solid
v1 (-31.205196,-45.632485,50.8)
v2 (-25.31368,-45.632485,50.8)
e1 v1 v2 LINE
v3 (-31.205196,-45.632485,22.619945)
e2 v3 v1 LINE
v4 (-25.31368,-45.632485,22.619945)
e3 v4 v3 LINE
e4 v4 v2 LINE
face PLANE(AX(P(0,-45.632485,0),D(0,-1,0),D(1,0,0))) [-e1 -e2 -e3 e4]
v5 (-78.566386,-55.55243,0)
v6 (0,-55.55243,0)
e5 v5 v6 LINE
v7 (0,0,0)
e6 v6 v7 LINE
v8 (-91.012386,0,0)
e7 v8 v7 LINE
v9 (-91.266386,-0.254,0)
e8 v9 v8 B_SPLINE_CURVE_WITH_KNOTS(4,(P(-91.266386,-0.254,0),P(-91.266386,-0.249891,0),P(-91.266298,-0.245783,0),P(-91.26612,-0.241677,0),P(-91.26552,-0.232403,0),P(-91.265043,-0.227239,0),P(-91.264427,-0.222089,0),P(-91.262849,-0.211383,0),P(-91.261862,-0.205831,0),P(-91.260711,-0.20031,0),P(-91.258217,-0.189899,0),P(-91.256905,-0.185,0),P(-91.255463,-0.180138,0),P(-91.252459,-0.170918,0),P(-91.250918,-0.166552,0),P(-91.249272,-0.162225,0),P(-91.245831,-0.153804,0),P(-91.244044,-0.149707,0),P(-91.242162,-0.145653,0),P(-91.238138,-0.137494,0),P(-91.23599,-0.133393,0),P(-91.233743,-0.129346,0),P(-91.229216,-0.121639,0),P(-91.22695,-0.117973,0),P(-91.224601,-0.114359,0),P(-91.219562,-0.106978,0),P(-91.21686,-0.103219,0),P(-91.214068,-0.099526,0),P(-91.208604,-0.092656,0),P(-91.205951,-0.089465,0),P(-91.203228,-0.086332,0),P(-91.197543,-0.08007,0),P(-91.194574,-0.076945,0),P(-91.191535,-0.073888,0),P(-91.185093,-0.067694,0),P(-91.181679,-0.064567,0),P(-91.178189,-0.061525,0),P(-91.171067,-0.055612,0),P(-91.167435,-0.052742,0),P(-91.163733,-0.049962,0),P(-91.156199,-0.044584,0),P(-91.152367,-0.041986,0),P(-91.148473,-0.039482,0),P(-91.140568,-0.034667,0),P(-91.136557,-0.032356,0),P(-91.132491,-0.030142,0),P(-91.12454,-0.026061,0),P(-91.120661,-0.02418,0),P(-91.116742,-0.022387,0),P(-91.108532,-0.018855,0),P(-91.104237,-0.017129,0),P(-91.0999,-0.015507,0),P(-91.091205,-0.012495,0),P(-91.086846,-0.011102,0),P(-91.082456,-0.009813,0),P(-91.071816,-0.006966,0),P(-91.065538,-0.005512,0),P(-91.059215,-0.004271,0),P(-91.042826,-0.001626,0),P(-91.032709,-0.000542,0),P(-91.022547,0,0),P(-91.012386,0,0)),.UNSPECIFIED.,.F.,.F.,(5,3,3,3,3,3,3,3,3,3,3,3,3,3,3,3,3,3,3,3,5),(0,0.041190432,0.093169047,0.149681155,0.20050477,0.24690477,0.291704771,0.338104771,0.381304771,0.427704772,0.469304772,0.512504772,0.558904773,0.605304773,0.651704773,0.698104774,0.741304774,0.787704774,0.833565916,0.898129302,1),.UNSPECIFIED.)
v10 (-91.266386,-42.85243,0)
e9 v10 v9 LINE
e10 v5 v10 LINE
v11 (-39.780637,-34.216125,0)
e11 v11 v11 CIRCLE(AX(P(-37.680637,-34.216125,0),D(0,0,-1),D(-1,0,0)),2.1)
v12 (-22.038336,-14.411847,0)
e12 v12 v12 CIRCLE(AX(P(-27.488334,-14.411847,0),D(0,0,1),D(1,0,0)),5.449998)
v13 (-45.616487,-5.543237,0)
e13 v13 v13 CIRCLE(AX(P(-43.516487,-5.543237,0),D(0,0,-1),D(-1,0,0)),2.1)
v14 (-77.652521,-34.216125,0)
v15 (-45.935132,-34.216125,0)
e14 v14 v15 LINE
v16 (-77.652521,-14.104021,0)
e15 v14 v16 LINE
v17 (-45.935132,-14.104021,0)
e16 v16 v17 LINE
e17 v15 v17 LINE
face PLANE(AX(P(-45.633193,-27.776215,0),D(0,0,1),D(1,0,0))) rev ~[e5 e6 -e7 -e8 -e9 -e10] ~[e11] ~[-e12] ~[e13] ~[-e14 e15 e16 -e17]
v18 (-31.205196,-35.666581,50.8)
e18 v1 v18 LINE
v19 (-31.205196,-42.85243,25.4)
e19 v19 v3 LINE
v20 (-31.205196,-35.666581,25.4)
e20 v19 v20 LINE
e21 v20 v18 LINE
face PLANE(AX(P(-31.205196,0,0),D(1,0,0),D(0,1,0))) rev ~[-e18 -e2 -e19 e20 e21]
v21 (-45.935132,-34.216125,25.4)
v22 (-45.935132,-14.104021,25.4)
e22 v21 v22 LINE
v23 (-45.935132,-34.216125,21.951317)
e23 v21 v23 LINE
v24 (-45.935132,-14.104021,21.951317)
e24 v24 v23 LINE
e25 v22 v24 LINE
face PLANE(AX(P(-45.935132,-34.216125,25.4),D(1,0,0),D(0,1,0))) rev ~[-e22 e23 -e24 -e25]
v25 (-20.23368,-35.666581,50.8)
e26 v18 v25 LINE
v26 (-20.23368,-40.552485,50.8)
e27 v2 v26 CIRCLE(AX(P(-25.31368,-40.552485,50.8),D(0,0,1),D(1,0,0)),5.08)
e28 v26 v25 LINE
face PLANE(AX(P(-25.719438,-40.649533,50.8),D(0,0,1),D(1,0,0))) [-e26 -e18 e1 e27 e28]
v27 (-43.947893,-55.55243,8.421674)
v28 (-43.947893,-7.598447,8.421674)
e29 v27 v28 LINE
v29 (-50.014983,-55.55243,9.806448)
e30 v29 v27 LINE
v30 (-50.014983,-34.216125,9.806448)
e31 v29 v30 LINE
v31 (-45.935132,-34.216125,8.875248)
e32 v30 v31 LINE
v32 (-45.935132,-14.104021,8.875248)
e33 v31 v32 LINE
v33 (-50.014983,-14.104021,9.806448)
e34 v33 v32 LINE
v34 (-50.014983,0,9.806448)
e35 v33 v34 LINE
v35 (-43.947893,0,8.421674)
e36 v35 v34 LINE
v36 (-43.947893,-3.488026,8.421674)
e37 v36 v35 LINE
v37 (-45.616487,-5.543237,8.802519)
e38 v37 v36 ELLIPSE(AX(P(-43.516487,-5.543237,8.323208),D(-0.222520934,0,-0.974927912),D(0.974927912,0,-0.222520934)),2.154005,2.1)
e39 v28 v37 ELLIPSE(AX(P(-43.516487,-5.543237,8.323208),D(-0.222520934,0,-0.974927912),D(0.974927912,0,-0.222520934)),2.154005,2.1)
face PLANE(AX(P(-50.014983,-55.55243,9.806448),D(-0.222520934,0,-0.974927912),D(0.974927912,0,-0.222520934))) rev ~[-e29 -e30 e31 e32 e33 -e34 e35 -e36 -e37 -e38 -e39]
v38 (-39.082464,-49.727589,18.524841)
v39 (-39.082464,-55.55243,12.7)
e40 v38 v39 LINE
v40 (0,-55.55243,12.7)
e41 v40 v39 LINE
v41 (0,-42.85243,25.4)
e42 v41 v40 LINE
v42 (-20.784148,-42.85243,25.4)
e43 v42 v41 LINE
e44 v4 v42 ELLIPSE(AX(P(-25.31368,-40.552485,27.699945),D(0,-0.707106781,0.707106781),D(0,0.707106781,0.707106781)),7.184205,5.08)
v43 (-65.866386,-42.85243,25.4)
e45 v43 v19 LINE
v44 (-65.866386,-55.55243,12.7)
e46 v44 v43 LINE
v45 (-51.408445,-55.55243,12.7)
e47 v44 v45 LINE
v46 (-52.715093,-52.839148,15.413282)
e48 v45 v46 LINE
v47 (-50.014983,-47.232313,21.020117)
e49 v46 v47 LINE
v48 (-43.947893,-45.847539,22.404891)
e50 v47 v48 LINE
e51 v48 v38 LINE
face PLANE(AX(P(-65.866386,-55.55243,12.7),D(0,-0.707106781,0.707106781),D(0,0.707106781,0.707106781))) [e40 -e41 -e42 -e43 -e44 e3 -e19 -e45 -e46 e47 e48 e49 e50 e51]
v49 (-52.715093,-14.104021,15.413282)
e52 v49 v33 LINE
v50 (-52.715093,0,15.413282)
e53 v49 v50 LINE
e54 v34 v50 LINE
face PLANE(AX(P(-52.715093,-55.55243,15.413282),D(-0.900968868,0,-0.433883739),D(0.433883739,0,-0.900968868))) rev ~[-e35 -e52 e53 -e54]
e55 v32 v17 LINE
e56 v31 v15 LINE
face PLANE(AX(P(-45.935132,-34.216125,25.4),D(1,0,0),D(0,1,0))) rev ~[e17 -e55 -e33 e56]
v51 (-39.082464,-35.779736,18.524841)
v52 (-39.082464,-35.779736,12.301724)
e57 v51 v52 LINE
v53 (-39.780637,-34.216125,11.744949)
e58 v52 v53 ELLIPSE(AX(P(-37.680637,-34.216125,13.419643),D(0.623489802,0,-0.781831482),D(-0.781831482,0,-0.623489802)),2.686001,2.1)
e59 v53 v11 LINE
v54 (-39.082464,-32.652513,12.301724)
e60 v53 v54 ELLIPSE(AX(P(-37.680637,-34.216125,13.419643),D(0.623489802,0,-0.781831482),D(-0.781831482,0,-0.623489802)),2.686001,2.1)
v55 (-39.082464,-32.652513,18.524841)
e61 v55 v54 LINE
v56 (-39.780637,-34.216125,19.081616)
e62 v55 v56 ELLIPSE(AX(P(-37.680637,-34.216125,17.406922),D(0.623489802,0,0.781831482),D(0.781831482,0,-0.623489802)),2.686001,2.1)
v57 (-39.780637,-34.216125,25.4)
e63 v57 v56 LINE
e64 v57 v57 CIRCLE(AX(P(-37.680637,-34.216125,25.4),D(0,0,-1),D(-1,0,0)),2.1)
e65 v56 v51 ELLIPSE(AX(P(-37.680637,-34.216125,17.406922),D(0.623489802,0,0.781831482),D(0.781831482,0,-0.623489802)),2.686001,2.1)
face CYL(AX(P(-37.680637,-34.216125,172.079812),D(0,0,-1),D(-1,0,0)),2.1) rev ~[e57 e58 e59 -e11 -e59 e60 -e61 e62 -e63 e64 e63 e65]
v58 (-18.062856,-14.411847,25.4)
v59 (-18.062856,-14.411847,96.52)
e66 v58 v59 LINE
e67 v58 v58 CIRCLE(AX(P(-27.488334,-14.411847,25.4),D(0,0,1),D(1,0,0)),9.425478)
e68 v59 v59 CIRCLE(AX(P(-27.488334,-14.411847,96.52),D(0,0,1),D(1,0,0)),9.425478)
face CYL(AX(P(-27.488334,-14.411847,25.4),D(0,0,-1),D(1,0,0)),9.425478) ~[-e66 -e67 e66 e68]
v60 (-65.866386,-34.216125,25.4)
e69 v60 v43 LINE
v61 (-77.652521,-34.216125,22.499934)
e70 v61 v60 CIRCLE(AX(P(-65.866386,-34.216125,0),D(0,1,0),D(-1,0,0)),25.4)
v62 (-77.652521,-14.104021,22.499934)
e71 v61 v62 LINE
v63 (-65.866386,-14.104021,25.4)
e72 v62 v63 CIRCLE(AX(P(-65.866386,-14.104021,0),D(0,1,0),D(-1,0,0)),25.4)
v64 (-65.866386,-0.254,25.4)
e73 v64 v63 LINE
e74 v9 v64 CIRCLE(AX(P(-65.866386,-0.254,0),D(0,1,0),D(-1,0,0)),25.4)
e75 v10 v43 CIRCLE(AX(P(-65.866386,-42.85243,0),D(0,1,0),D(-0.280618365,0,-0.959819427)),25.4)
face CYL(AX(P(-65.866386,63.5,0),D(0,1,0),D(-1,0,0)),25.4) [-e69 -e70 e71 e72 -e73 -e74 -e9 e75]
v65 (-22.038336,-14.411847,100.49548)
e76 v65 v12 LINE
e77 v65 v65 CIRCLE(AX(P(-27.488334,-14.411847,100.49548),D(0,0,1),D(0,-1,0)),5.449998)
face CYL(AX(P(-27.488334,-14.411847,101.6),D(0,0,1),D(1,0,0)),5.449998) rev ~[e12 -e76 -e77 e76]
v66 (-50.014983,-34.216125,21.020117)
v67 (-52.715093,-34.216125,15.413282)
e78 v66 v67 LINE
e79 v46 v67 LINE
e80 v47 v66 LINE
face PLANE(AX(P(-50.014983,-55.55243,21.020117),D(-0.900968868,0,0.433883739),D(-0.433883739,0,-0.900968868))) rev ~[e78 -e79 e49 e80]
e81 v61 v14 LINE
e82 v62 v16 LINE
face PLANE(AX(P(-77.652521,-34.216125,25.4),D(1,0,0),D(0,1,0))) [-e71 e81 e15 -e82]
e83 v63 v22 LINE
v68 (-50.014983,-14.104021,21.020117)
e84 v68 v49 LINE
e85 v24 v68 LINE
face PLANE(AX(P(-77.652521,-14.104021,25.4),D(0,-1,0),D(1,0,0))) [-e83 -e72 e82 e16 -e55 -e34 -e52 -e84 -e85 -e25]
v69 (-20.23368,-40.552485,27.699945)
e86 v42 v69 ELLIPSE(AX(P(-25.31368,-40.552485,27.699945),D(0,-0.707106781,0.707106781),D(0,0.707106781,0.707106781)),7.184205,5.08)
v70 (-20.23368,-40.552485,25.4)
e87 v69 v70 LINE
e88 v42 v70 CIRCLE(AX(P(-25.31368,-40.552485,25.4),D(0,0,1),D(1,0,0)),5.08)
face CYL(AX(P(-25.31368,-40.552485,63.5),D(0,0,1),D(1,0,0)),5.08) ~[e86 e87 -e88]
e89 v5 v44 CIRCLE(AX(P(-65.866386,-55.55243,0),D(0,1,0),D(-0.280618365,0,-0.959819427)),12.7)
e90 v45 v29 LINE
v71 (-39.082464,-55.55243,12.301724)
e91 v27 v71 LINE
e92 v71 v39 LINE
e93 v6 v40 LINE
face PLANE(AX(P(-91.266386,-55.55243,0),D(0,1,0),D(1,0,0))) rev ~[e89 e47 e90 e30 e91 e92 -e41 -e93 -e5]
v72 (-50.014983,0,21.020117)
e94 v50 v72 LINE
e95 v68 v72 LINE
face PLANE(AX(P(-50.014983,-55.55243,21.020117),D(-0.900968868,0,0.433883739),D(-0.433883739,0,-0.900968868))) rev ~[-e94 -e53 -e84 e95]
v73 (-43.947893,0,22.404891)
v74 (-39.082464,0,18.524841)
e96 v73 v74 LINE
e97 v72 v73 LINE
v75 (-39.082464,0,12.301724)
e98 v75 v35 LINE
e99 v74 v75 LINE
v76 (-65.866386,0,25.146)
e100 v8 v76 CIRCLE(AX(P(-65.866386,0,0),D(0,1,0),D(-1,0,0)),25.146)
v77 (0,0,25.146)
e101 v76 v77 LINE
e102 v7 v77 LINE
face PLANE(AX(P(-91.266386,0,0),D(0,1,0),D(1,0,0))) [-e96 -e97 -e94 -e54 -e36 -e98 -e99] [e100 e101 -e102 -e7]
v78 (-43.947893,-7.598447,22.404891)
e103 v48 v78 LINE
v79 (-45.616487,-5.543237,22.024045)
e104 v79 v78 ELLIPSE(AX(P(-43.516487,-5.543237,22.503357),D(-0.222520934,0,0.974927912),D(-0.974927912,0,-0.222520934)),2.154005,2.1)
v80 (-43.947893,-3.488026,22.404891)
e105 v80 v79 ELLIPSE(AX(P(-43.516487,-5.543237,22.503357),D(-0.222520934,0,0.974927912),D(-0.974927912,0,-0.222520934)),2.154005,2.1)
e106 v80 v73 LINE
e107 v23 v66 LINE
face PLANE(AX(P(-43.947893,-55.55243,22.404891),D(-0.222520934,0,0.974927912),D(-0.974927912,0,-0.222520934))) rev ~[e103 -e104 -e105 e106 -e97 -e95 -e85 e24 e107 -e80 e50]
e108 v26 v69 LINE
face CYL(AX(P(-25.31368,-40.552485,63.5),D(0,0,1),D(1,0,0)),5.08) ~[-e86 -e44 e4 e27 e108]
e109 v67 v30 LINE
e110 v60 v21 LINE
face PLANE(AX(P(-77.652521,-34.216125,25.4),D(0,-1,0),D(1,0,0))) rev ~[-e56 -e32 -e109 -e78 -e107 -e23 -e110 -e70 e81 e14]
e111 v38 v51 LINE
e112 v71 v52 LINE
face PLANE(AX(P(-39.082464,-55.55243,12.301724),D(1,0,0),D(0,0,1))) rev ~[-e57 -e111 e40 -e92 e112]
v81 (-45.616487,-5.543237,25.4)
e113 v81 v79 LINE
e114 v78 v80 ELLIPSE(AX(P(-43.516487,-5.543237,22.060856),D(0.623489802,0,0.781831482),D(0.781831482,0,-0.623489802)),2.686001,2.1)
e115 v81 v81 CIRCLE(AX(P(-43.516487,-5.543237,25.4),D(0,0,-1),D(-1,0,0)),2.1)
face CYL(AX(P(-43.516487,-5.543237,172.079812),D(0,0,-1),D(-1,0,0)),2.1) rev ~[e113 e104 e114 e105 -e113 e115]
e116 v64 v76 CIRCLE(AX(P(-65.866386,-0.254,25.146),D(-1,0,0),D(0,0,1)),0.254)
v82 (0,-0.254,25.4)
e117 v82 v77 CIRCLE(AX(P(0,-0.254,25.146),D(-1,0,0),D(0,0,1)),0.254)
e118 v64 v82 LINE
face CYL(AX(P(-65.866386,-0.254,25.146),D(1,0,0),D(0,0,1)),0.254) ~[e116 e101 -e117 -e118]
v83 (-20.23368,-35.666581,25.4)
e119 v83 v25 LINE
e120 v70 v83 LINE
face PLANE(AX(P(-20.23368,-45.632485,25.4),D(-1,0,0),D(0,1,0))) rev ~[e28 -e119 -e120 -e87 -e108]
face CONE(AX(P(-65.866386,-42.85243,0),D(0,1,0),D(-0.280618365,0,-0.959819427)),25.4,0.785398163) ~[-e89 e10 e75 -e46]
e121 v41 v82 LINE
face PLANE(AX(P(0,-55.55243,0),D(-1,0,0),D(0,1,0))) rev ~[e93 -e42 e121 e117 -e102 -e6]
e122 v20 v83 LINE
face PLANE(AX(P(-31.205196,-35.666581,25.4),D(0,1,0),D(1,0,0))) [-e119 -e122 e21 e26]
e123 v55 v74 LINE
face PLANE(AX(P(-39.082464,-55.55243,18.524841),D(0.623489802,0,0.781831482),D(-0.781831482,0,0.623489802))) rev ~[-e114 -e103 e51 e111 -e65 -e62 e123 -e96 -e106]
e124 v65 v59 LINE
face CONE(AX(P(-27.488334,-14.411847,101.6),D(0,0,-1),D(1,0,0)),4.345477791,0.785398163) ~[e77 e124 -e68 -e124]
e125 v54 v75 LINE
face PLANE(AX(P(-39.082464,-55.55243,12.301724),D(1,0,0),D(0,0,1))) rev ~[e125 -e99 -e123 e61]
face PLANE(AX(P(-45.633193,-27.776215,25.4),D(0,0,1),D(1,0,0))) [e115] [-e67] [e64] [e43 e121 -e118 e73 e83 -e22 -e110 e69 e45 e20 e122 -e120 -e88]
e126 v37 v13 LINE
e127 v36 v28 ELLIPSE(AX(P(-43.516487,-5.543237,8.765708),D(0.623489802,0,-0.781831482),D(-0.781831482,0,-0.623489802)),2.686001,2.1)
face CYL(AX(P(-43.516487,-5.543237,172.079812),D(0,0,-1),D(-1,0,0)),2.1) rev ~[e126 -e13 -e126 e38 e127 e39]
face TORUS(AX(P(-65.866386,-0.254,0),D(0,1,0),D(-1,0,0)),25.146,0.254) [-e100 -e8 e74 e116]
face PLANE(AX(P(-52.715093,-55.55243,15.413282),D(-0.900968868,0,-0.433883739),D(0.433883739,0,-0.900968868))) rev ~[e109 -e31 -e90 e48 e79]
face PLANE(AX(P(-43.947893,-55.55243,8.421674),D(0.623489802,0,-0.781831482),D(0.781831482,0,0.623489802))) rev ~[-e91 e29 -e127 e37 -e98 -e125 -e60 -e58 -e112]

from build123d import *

# Parameters (mm, degrees)
F0_W          = 91.2663862109
F0_H          = 55.5524304509
F1_DEPTH      = 25.4
F2_W          = 31.717389822
F2_H          = 20.1121037826
F3_DEPTH      = 25.401
F4_R          = 9.4254777906
F5_DEPTH      = 76.2
F7_DEPTH      = 55.5534304509
F8_R          = 5.4499976888
F9_DEPTH      = 101.601
F10_W         = 10.9715163708
F10_H         = 9.965904057
F11_DEPTH     = 25.4
F12_T1_DEPTH  = 182.5524304509
F13_T4_DEPTH  = 98.5267601581
F13_T10_DEPTH = 98.5267601581
F13_T16_DEPTH = 98.5267601581
F13_T23_DEPTH = 98.5267601581
F13_T29_DEPTH = 98.5267601581
F13_T33_ANGLE = 163.70288589
F15_T4_DEPTH  = 53.5800548494
F15_T10_DEPTH = 53.5800548494
F15_T16_DEPTH = 53.5800548494
F17_D         = 4.2
F18_R         = 0.254


# Not quite as in the source:
# - a fillet or chamfer that OpenCascade refuses, or shapes differently, is made with other operations: its cross-section is extruded or revolved along the edge and cut away or added


with BuildPart() as f1:
    # F0 (on Top) → F1 (new body)
    with BuildSketch(Plane.XY):
        with Locations((-45.6331931055, -27.7762152255)):
            Rectangle(F0_W, F0_H)
    extrude(amount=F1_DEPTH)

    # F2 (on face) → F3 (cut, through all)
    with BuildSketch(Plane.XY.offset(25.4)):
        with Locations((-61.7938265204, -24.1600726731)):
            Rectangle(F2_W, F2_H)
    extrude(amount=-F3_DEPTH, mode=Mode.SUBTRACT)

    # F4 (on face) → F5 (join)
    with BuildSketch(Plane.XY.offset(25.4)):
        with Locations((-27.4883341044, -14.4118471071)):
            Circle(F4_R)
    extrude(amount=F5_DEPTH)

    # F6 (on face) → F7 (cut, through all)
    with BuildSketch(Plane.XZ.offset(55.5524304509)):
        Polygon((-39.0824638307, 12.301723844), (-39.0824638307, 18.5248410342), (-43.9478927691, 22.4048911381), (-50.0149834187, 21.0201172888), (-52.7150927741, 15.4132824391), (-50.0149834187, 9.8064475894), (-43.9478927691, 8.4216737401), align=None)
    extrude(amount=-F7_DEPTH, mode=Mode.SUBTRACT)

    # F8 (on face) → F9 (cut, through all)
    with BuildSketch(Plane.XY.offset(101.6)):
        with Locations((-27.4883341044, -14.4118471071)):
            Circle(F8_R)
    extrude(amount=-F9_DEPTH, mode=Mode.SUBTRACT)

    # F10 (on face) → F11 (join)
    with BuildSketch(Plane.XY.offset(25.4)):
        with Locations((-25.7194377482, -40.6495332718)):
            Rectangle(F10_W, F10_H)
    extrude(amount=F11_DEPTH)

    # F12: fillet of radius 25.4 on 1 edges, made by hand

    # F12_s2 → F12_t1 (cut)
    with BuildSketch(Plane.XZ.offset(-63.5)):
        with BuildLine():
            ThreePointArc((-91.2663862109, 0), (-83.8268984531, 17.9605122421), (-65.8663862109, 25.4))
            Line((-65.8663862109, 25.4), (-91.2663862109, 25.4))
            Line((-91.2663862109, 25.4), (-91.2663862109, 0))
        make_face()
    extrude(amount=F12_T1_DEPTH, mode=Mode.SUBTRACT)

    # F13: chamfer of 12.7 on 1 edges, made by hand


with BuildPart() as f13_tool2:
    # F13_s3 → F13_t4 (new body)
    with BuildSketch(Plane.YZ.offset(-65.8663862109)):
        Polygon((-55.5524304509, 12.7), (-42.8524304509, 25.4), (-55.5524304509, 25.4), align=None)
    extrude(amount=F13_T4_DEPTH)

    split(bisect_by=Plane.YZ.offset(-31.2051959336), keep=Keep.BOTTOM)

    split(bisect_by=Plane.XZ.offset(45.6324853003), keep=Keep.TOP)


with BuildPart() as f1_1:
    add(f1.part)

    # F13_t1: cut F13_tool2
    add(f13_tool2.part, mode=Mode.SUBTRACT)


with BuildPart() as f13_tool8:
    # F13_s9 → F13_t10 (new body)
    with BuildSketch(Plane.YZ.offset(-65.8663862109)):
        Polygon((-55.5524304509, 12.7), (-42.8524304509, 25.4), (-55.5524304509, 25.4), align=None)
    extrude(amount=F13_T10_DEPTH)

    split(bisect_by=Plane.YZ.offset(-31.2051959336), keep=Keep.BOTTOM)

    split(bisect_by=Plane.XZ.offset(45.6324853003), keep=Keep.BOTTOM)


with BuildPart() as f1_2:
    add(f1_1.part)

    # F13_t7: cut F13_tool8
    add(f13_tool8.part, mode=Mode.SUBTRACT)


with BuildPart() as f13_tool14:
    # F13_s15 → F13_t16 (new body)
    with BuildSketch(Plane.YZ.offset(-65.8663862109)):
        Polygon((-55.5524304509, 12.7), (-42.8524304509, 25.4), (-55.5524304509, 25.4), align=None)
    extrude(amount=F13_T16_DEPTH)

    split(bisect_by=Plane.YZ.offset(-20.2336795628), keep=Keep.BOTTOM)

    split(bisect_by=Plane.YZ.offset(-31.2051959336), keep=Keep.TOP)

    split(bisect_by=Plane.XZ.offset(45.6324853003), keep=Keep.TOP)


with BuildPart() as f1_3:
    add(f1_2.part)

    # F13_t13: cut F13_tool14
    add(f13_tool14.part, mode=Mode.SUBTRACT)


with BuildPart() as f13_tool21:
    # F13_s22 → F13_t23 (new body)
    with BuildSketch(Plane.YZ.offset(-65.8663862109)):
        Polygon((-55.5524304509, 12.7), (-42.8524304509, 25.4), (-55.5524304509, 25.4), align=None)
    extrude(amount=F13_T23_DEPTH)

    split(bisect_by=Plane.YZ.offset(-20.2336795628), keep=Keep.TOP)

    split(bisect_by=Plane.XZ.offset(45.6324853003), keep=Keep.TOP)


with BuildPart() as f1_4:
    add(f1_3.part)

    # F13_t20: cut F13_tool21
    add(f13_tool21.part, mode=Mode.SUBTRACT)


with BuildPart() as f13_tool27:
    # F13_s28 → F13_t29 (new body)
    with BuildSketch(Plane.YZ.offset(-65.8663862109)):
        Polygon((-55.5524304509, 12.7), (-42.8524304509, 25.4), (-55.5524304509, 25.4), align=None)
    extrude(amount=F13_T29_DEPTH)

    split(bisect_by=Plane.YZ.offset(-20.2336795628), keep=Keep.TOP)

    split(bisect_by=Plane.XZ.offset(45.6324853003), keep=Keep.BOTTOM)


with BuildPart() as f1_5:
    add(f1_4.part)

    # F13_t26: cut F13_tool27
    add(f13_tool27.part, mode=Mode.SUBTRACT)

    # F13_s32 → F13_t33 (revolve, cut)
    with BuildSketch(Plane(origin=(-60.6796278509, 0, 17.7406473118), x_dir=(0, 1, 0), z_dir=(0.9598194275, 0, -0.2806183648))):
        Polygon((-42.8524304509, -43.8833175952), (-55.5524304509, -31.1833175952), (-55.5524304509, -43.8833175952), align=None)
    revolve(axis=Axis((-65.8663862109, -55.5524304509, 0), (0, 1, 0)), revolution_arc=F13_T33_ANGLE, mode=Mode.SUBTRACT)

    # F14: chamfer of 5.08 on 1 edges, made by hand

    # F14_s1 → F14_t2 (revolve, cut)
    with BuildSketch(Plane.XZ.offset(14.4118471071)):
        Polygon((-23.1428563138, 101.6), (-18.0628563138, 96.52), (-18.0628563138, 101.6), align=None)
    revolve(axis=Axis((-27.4883341044, -14.4118471071, 101.6), (0, 0, 1)), mode=Mode.SUBTRACT)

    # F15: fillet of radius 5.08 on 1 edges, made by hand


with BuildPart() as f15_tool2:
    # F15_s3 → F15_t4 (new body)
    with BuildSketch(Plane.XY.offset(63.5)):
        with BuildLine():
            ThreePointArc((-20.2336795628, -40.5524853003), (-21.7215771144, -44.1445877487), (-25.3136795628, -45.6324853003))
            Line((-25.3136795628, -45.6324853003), (-20.2336795628, -45.6324853003))
            Line((-20.2336795628, -45.6324853003), (-20.2336795628, -40.5524853003))
        make_face()
    extrude(amount=-F15_T4_DEPTH)

    split(bisect_by=Plane.XY.offset(25.4), keep=Keep.TOP)

    split(bisect_by=Plane(origin=(0, -34.1262152254, 34.1262152254), x_dir=(1, 0, 0), z_dir=(0, -0.7071067812, 0.7071067812)), keep=Keep.TOP)


with BuildPart() as f1_6:
    add(f1_5.part)

    # F15_t1: cut F15_tool2
    add(f15_tool2.part, mode=Mode.SUBTRACT)


with BuildPart() as f15_tool8:
    # F15_s9 → F15_t10 (new body)
    with BuildSketch(Plane.XY.offset(63.5)):
        with BuildLine():
            ThreePointArc((-20.2336795628, -40.5524853003), (-21.7215771144, -44.1445877487), (-25.3136795628, -45.6324853003))
            Line((-25.3136795628, -45.6324853003), (-20.2336795628, -45.6324853003))
            Line((-20.2336795628, -45.6324853003), (-20.2336795628, -40.5524853003))
        make_face()
    extrude(amount=-F15_T10_DEPTH)

    split(bisect_by=Plane.XY.offset(25.4), keep=Keep.BOTTOM)

    split(bisect_by=Plane(origin=(0, -34.1262152255, 34.1262152254), x_dir=(1, 0, 0), z_dir=(0, -0.7071067812, 0.7071067812)), keep=Keep.TOP)


with BuildPart() as f1_7:
    add(f1_6.part)

    # F15_t7: cut F15_tool8
    add(f15_tool8.part, mode=Mode.SUBTRACT)


with BuildPart() as f15_tool14:
    # F15_s15 → F15_t16 (new body)
    with BuildSketch(Plane.XY.offset(63.5)):
        with BuildLine():
            ThreePointArc((-20.2336795628, -40.5524853003), (-21.7215771144, -44.1445877487), (-25.3136795628, -45.6324853003))
            Line((-25.3136795628, -45.6324853003), (-20.2336795628, -45.6324853003))
            Line((-20.2336795628, -45.6324853003), (-20.2336795628, -40.5524853003))
        make_face()
    extrude(amount=-F15_T16_DEPTH)

    split(bisect_by=Plane.XY.offset(25.4), keep=Keep.TOP)

    split(bisect_by=Plane(origin=(0, -34.1262152255, 34.1262152254), x_dir=(1, 0, 0), z_dir=(0, 0.7071067812, -0.7071067812)), keep=Keep.TOP)


with BuildPart() as f1_8:
    add(f1_7.part)

    # F15_t13: cut F15_tool14
    add(f15_tool14.part, mode=Mode.SUBTRACT)

    # F17 (through all)
    with Locations(Plane.XY.offset(25.4)):
        with Locations((-37.6806370914, -34.2161245644), (-43.5164868832, -5.5432366207)):
            Hole(F17_D / 2)

    # F18
    f18_edges = [f1_8.edges().sort_by_distance(p)[0] for p in [
        (-83.826898, 0, 17.960512),
    ]]
    fillet(f18_edges, radius=F18_R)


solid = f1_8.part
